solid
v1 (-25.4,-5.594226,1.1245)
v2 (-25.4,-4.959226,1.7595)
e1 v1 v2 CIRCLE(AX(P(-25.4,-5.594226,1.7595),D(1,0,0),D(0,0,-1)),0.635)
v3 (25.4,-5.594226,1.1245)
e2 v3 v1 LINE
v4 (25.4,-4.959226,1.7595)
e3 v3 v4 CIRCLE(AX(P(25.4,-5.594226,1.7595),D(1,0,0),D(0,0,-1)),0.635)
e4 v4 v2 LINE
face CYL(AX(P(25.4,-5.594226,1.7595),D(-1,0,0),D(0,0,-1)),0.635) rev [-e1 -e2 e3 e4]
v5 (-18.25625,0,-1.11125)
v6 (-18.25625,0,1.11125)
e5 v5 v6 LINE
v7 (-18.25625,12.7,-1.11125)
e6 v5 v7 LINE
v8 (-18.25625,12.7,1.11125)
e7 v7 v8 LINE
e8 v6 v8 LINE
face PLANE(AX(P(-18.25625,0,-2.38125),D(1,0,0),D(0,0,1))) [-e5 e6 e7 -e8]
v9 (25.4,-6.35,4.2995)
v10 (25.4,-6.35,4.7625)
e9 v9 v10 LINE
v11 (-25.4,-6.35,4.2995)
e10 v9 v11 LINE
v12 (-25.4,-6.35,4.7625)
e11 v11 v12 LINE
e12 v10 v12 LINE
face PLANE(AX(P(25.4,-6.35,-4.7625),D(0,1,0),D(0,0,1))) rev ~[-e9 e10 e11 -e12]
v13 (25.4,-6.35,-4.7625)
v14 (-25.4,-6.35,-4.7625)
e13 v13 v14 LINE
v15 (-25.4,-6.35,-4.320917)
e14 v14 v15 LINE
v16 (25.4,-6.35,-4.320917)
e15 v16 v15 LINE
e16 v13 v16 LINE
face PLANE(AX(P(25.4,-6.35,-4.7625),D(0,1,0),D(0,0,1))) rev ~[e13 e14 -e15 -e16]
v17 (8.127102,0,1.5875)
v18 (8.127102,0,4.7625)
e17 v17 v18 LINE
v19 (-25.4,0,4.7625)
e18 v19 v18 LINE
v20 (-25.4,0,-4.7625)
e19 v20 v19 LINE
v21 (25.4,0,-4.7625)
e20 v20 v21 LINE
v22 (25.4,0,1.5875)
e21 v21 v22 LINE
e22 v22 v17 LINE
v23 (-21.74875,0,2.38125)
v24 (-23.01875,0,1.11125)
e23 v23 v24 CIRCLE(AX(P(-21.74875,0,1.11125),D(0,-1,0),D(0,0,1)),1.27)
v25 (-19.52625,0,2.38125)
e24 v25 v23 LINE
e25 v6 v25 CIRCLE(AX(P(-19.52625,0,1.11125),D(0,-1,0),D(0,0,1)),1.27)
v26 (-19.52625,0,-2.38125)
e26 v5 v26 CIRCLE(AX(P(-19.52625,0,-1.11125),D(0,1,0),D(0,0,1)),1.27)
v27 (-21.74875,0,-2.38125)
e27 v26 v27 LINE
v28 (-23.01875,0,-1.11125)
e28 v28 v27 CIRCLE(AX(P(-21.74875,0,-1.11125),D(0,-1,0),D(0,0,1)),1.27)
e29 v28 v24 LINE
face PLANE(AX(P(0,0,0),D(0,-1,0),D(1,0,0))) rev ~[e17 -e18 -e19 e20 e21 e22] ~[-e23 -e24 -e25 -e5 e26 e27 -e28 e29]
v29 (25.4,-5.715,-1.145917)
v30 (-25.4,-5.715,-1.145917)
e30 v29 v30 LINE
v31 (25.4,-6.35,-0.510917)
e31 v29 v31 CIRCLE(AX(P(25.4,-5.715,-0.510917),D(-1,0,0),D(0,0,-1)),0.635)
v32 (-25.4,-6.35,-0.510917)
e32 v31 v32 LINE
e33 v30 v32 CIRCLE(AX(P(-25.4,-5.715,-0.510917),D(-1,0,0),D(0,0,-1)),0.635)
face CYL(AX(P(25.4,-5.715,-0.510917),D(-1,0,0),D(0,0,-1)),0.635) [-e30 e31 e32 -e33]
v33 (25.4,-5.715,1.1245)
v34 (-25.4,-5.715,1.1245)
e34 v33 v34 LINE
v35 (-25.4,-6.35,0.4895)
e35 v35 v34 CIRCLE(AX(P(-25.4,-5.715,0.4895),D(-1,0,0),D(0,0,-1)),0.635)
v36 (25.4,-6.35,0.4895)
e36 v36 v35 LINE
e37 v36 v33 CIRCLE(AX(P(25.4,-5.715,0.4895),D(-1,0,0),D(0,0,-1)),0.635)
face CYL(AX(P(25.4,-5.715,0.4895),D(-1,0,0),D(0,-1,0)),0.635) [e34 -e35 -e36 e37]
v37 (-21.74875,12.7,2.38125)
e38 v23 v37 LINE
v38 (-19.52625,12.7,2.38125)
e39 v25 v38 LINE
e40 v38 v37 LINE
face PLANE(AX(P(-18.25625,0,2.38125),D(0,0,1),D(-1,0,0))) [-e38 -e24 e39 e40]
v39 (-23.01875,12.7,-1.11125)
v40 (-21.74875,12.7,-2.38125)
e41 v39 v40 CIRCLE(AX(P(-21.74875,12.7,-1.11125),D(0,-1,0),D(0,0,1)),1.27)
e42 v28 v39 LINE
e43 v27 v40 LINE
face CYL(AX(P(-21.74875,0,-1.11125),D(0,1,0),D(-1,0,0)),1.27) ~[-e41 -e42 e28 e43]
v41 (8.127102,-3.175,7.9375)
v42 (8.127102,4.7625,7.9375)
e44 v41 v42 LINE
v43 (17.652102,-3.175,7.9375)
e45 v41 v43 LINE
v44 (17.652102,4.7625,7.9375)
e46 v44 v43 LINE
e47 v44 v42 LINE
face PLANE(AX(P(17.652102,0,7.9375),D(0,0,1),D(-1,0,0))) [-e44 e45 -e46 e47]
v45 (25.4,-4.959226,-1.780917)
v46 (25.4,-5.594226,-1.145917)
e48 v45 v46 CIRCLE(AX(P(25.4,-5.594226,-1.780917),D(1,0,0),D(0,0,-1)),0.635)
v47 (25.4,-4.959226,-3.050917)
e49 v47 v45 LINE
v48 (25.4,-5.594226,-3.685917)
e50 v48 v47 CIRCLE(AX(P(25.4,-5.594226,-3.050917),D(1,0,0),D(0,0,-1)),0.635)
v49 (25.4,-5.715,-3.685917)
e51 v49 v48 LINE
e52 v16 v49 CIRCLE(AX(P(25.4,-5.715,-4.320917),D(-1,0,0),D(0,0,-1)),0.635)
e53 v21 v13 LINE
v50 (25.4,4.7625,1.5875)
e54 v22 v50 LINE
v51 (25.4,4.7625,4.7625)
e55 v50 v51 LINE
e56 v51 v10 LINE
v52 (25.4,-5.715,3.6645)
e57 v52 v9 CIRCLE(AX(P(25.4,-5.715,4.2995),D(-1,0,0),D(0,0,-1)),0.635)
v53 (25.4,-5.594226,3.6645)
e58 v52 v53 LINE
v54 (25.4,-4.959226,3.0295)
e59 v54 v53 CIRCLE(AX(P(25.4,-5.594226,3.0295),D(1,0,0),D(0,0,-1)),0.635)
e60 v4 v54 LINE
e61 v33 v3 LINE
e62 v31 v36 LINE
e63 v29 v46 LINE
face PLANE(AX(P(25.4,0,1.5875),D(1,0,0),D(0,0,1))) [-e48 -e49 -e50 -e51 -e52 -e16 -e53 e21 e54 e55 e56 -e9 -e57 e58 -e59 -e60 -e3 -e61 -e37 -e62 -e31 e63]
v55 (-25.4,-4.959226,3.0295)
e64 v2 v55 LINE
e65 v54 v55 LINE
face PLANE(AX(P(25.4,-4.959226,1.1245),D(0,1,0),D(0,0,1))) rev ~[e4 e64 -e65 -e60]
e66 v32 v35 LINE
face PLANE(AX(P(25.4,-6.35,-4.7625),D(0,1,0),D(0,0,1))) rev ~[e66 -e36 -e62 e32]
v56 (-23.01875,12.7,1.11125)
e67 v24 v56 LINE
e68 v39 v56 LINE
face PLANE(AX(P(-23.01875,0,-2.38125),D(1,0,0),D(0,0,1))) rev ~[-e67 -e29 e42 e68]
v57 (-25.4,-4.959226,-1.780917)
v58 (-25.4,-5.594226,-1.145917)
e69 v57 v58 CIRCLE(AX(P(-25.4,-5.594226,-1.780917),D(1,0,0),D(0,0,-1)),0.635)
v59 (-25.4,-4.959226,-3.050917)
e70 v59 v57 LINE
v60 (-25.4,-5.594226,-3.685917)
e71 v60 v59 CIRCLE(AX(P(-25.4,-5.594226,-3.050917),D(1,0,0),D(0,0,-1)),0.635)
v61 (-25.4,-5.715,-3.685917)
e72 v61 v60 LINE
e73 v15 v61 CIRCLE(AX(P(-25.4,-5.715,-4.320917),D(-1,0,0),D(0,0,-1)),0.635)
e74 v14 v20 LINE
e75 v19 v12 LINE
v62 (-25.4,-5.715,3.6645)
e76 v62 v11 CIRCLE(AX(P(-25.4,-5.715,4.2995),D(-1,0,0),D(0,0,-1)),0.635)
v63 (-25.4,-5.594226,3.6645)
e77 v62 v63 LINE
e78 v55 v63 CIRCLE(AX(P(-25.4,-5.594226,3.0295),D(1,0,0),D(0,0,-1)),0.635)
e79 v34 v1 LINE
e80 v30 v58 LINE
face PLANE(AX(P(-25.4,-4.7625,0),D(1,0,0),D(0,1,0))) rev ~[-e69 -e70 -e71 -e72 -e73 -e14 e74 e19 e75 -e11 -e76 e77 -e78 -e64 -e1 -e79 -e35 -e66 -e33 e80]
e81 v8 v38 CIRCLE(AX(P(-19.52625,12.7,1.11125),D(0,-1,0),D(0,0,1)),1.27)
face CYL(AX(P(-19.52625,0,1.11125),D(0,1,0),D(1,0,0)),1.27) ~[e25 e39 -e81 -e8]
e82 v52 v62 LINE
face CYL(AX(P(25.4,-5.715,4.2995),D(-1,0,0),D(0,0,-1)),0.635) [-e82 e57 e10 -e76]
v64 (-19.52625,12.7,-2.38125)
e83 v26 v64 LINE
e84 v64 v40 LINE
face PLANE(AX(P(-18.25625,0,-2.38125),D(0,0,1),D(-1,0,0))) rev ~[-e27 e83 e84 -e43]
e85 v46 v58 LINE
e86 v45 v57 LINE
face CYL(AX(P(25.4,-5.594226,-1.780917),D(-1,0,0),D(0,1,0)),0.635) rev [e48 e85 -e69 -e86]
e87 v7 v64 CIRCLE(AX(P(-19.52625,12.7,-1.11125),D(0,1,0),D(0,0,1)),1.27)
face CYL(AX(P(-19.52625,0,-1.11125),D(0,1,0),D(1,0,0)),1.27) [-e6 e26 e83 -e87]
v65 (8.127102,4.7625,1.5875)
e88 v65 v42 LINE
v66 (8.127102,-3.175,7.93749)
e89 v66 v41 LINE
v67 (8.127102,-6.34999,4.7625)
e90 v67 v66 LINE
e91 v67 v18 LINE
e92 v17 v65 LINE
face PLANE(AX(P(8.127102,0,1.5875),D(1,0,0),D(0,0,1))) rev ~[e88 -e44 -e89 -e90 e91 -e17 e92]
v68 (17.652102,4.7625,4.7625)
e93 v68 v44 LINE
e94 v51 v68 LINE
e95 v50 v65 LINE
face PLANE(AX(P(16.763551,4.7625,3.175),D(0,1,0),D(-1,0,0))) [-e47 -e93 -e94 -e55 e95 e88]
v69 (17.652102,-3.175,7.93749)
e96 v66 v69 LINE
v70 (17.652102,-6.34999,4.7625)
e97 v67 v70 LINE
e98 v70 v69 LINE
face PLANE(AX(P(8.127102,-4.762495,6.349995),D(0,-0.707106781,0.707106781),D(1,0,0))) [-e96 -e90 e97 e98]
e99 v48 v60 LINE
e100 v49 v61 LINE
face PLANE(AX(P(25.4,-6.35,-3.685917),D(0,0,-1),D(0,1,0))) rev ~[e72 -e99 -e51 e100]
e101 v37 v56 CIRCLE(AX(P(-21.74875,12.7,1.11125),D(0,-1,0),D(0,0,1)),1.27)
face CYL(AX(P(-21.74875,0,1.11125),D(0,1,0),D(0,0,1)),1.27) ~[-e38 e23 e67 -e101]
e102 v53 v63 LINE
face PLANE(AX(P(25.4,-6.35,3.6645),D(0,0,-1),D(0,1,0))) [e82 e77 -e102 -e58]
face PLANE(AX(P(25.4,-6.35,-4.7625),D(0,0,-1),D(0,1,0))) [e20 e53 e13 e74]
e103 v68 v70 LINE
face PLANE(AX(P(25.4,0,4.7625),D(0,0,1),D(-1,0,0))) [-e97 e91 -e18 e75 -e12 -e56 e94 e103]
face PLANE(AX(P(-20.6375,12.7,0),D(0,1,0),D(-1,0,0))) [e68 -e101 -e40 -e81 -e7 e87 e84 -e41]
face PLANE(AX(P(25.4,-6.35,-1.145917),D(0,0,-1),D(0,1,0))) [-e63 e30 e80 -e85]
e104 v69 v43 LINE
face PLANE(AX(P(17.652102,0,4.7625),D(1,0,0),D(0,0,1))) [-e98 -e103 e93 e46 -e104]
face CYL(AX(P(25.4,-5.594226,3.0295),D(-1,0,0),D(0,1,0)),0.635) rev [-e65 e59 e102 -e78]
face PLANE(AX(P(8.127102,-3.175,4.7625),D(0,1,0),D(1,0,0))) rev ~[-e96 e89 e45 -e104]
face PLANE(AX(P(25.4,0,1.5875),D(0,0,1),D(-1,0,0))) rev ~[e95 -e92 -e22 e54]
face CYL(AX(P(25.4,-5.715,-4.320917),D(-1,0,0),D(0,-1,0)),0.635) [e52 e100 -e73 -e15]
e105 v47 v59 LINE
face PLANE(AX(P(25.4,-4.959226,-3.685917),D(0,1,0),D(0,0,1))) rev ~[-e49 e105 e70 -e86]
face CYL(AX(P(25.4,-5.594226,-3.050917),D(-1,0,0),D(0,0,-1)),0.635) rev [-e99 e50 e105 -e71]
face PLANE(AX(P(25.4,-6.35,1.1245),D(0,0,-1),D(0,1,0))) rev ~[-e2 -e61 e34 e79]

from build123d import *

# Parameters (mm, degrees)
F0_W      = 50.8
F0_H      = 9.525
F1_DEPTH  = 3.175
F2_W      = 3.175
F2_H      = 9.525
F3_DEPTH  = 50.8
F4_W      = 4.7625
F4_H      = 4.7625
F5_DEPTH  = 12.7
F6_R      = 1.27
F7_W      = 9.525
F7_H      = 3.175
F8_DEPTH  = 3.175
F9_W      = 17.272898303
F9_H      = 3.175
F9_W_2    = 9.525
F10_DEPTH = 4.7625
F11_W     = 1.3907738797
F11_H     = 2.54
F12_DEPTH = 50.8
F13_R     = 0.635
F14_SIZE  = 3.17499


# Not quite as in the source:
# - a fillet or chamfer is up to 0.001 mm smaller than in the source, because OpenCascade refuses the exact size


with BuildPart() as f1:
    # F0 (on Front) → F1 (new body)
    with BuildSketch(Plane.XZ):
        Rectangle(F0_W, F0_H)
    extrude(amount=F1_DEPTH)

    # F2 (on face) → F3 (join)
    with BuildSketch(Plane.YZ.offset(25.4)):
        with Locations((-4.7625, 0)):
            Rectangle(F2_W, F2_H)
    extrude(amount=-F3_DEPTH)

    # F4 (on face) → F5 (join)
    with BuildSketch(Plane(origin=(0, 0, 0), x_dir=(-1, 0, 0), z_dir=(0, 1, 0))):
        with Locations((20.6375, 0)):
            Rectangle(F4_W, F4_H)
    extrude(amount=F5_DEPTH)

    # F6
    f6_edges = [f1.edges().sort_by_distance(p)[0] for p in [
        (-18.25625, 6.35, 2.38125),
        (-23.01875, 6.35, 2.38125),
        (-18.25625, 6.35, -2.38125),
        (-23.01875, 6.35, -2.38125),
    ]]
    fillet(f6_edges, radius=F6_R)

    # F7 (on face) → F8 (join)
    with BuildSketch(Plane.XY.offset(4.7625)):
        with Locations((12.889601697, -1.5875)):
            Rectangle(F7_W, F7_H)
    extrude(amount=F8_DEPTH)

    # F9 (on face) → F10 (join)
    with BuildSketch(Plane(origin=(0, 0, 0), x_dir=(-1, 0, 0), z_dir=(0, 1, 0))):
        with Locations((-16.7635508485, 3.175)):
            Rectangle(F9_W, F9_H)
        with Locations((-12.889601697, 6.35)):
            Rectangle(F9_W_2, F9_H)
    extrude(amount=F10_DEPTH)

    # F11 (on face) → F12 (cut)
    with BuildSketch(Plane.YZ.offset(25.4)):
        with Locations((-5.6546130601, 2.3944999478)):
            Rectangle(F11_W, F11_H)
        with Locations((-5.6546130601, -2.4159172396)):
            Rectangle(F11_W, F11_H)
    extrude(amount=-F12_DEPTH, mode=Mode.SUBTRACT)

    # F13
    f13_edges = [f1.edges().sort_by_distance(p)[0] for p in [
        (0, -4.959226, 1.1245),
        (0, -4.959226, 3.6645),
        (0, -4.959226, -3.685917),
        (0, -4.959226, -1.145917),
        (0, -6.35, 1.1245),
        (0, -6.35, -1.145917),
        (0, -6.35, 3.6645),
        (0, -6.35, -3.685917),
    ]]
    fillet(f13_edges, radius=F13_R)

    # F14 (size 3.175 in the source; OpenCascade refuses exactly that, so slightly less here)
    f14_edges = [f1.edges().sort_by_distance(p)[0] for p in [
        (12.889602, -3.175, 4.7625),
    ]]
    chamfer(f14_edges, length=F14_SIZE)


solid = f1.part
